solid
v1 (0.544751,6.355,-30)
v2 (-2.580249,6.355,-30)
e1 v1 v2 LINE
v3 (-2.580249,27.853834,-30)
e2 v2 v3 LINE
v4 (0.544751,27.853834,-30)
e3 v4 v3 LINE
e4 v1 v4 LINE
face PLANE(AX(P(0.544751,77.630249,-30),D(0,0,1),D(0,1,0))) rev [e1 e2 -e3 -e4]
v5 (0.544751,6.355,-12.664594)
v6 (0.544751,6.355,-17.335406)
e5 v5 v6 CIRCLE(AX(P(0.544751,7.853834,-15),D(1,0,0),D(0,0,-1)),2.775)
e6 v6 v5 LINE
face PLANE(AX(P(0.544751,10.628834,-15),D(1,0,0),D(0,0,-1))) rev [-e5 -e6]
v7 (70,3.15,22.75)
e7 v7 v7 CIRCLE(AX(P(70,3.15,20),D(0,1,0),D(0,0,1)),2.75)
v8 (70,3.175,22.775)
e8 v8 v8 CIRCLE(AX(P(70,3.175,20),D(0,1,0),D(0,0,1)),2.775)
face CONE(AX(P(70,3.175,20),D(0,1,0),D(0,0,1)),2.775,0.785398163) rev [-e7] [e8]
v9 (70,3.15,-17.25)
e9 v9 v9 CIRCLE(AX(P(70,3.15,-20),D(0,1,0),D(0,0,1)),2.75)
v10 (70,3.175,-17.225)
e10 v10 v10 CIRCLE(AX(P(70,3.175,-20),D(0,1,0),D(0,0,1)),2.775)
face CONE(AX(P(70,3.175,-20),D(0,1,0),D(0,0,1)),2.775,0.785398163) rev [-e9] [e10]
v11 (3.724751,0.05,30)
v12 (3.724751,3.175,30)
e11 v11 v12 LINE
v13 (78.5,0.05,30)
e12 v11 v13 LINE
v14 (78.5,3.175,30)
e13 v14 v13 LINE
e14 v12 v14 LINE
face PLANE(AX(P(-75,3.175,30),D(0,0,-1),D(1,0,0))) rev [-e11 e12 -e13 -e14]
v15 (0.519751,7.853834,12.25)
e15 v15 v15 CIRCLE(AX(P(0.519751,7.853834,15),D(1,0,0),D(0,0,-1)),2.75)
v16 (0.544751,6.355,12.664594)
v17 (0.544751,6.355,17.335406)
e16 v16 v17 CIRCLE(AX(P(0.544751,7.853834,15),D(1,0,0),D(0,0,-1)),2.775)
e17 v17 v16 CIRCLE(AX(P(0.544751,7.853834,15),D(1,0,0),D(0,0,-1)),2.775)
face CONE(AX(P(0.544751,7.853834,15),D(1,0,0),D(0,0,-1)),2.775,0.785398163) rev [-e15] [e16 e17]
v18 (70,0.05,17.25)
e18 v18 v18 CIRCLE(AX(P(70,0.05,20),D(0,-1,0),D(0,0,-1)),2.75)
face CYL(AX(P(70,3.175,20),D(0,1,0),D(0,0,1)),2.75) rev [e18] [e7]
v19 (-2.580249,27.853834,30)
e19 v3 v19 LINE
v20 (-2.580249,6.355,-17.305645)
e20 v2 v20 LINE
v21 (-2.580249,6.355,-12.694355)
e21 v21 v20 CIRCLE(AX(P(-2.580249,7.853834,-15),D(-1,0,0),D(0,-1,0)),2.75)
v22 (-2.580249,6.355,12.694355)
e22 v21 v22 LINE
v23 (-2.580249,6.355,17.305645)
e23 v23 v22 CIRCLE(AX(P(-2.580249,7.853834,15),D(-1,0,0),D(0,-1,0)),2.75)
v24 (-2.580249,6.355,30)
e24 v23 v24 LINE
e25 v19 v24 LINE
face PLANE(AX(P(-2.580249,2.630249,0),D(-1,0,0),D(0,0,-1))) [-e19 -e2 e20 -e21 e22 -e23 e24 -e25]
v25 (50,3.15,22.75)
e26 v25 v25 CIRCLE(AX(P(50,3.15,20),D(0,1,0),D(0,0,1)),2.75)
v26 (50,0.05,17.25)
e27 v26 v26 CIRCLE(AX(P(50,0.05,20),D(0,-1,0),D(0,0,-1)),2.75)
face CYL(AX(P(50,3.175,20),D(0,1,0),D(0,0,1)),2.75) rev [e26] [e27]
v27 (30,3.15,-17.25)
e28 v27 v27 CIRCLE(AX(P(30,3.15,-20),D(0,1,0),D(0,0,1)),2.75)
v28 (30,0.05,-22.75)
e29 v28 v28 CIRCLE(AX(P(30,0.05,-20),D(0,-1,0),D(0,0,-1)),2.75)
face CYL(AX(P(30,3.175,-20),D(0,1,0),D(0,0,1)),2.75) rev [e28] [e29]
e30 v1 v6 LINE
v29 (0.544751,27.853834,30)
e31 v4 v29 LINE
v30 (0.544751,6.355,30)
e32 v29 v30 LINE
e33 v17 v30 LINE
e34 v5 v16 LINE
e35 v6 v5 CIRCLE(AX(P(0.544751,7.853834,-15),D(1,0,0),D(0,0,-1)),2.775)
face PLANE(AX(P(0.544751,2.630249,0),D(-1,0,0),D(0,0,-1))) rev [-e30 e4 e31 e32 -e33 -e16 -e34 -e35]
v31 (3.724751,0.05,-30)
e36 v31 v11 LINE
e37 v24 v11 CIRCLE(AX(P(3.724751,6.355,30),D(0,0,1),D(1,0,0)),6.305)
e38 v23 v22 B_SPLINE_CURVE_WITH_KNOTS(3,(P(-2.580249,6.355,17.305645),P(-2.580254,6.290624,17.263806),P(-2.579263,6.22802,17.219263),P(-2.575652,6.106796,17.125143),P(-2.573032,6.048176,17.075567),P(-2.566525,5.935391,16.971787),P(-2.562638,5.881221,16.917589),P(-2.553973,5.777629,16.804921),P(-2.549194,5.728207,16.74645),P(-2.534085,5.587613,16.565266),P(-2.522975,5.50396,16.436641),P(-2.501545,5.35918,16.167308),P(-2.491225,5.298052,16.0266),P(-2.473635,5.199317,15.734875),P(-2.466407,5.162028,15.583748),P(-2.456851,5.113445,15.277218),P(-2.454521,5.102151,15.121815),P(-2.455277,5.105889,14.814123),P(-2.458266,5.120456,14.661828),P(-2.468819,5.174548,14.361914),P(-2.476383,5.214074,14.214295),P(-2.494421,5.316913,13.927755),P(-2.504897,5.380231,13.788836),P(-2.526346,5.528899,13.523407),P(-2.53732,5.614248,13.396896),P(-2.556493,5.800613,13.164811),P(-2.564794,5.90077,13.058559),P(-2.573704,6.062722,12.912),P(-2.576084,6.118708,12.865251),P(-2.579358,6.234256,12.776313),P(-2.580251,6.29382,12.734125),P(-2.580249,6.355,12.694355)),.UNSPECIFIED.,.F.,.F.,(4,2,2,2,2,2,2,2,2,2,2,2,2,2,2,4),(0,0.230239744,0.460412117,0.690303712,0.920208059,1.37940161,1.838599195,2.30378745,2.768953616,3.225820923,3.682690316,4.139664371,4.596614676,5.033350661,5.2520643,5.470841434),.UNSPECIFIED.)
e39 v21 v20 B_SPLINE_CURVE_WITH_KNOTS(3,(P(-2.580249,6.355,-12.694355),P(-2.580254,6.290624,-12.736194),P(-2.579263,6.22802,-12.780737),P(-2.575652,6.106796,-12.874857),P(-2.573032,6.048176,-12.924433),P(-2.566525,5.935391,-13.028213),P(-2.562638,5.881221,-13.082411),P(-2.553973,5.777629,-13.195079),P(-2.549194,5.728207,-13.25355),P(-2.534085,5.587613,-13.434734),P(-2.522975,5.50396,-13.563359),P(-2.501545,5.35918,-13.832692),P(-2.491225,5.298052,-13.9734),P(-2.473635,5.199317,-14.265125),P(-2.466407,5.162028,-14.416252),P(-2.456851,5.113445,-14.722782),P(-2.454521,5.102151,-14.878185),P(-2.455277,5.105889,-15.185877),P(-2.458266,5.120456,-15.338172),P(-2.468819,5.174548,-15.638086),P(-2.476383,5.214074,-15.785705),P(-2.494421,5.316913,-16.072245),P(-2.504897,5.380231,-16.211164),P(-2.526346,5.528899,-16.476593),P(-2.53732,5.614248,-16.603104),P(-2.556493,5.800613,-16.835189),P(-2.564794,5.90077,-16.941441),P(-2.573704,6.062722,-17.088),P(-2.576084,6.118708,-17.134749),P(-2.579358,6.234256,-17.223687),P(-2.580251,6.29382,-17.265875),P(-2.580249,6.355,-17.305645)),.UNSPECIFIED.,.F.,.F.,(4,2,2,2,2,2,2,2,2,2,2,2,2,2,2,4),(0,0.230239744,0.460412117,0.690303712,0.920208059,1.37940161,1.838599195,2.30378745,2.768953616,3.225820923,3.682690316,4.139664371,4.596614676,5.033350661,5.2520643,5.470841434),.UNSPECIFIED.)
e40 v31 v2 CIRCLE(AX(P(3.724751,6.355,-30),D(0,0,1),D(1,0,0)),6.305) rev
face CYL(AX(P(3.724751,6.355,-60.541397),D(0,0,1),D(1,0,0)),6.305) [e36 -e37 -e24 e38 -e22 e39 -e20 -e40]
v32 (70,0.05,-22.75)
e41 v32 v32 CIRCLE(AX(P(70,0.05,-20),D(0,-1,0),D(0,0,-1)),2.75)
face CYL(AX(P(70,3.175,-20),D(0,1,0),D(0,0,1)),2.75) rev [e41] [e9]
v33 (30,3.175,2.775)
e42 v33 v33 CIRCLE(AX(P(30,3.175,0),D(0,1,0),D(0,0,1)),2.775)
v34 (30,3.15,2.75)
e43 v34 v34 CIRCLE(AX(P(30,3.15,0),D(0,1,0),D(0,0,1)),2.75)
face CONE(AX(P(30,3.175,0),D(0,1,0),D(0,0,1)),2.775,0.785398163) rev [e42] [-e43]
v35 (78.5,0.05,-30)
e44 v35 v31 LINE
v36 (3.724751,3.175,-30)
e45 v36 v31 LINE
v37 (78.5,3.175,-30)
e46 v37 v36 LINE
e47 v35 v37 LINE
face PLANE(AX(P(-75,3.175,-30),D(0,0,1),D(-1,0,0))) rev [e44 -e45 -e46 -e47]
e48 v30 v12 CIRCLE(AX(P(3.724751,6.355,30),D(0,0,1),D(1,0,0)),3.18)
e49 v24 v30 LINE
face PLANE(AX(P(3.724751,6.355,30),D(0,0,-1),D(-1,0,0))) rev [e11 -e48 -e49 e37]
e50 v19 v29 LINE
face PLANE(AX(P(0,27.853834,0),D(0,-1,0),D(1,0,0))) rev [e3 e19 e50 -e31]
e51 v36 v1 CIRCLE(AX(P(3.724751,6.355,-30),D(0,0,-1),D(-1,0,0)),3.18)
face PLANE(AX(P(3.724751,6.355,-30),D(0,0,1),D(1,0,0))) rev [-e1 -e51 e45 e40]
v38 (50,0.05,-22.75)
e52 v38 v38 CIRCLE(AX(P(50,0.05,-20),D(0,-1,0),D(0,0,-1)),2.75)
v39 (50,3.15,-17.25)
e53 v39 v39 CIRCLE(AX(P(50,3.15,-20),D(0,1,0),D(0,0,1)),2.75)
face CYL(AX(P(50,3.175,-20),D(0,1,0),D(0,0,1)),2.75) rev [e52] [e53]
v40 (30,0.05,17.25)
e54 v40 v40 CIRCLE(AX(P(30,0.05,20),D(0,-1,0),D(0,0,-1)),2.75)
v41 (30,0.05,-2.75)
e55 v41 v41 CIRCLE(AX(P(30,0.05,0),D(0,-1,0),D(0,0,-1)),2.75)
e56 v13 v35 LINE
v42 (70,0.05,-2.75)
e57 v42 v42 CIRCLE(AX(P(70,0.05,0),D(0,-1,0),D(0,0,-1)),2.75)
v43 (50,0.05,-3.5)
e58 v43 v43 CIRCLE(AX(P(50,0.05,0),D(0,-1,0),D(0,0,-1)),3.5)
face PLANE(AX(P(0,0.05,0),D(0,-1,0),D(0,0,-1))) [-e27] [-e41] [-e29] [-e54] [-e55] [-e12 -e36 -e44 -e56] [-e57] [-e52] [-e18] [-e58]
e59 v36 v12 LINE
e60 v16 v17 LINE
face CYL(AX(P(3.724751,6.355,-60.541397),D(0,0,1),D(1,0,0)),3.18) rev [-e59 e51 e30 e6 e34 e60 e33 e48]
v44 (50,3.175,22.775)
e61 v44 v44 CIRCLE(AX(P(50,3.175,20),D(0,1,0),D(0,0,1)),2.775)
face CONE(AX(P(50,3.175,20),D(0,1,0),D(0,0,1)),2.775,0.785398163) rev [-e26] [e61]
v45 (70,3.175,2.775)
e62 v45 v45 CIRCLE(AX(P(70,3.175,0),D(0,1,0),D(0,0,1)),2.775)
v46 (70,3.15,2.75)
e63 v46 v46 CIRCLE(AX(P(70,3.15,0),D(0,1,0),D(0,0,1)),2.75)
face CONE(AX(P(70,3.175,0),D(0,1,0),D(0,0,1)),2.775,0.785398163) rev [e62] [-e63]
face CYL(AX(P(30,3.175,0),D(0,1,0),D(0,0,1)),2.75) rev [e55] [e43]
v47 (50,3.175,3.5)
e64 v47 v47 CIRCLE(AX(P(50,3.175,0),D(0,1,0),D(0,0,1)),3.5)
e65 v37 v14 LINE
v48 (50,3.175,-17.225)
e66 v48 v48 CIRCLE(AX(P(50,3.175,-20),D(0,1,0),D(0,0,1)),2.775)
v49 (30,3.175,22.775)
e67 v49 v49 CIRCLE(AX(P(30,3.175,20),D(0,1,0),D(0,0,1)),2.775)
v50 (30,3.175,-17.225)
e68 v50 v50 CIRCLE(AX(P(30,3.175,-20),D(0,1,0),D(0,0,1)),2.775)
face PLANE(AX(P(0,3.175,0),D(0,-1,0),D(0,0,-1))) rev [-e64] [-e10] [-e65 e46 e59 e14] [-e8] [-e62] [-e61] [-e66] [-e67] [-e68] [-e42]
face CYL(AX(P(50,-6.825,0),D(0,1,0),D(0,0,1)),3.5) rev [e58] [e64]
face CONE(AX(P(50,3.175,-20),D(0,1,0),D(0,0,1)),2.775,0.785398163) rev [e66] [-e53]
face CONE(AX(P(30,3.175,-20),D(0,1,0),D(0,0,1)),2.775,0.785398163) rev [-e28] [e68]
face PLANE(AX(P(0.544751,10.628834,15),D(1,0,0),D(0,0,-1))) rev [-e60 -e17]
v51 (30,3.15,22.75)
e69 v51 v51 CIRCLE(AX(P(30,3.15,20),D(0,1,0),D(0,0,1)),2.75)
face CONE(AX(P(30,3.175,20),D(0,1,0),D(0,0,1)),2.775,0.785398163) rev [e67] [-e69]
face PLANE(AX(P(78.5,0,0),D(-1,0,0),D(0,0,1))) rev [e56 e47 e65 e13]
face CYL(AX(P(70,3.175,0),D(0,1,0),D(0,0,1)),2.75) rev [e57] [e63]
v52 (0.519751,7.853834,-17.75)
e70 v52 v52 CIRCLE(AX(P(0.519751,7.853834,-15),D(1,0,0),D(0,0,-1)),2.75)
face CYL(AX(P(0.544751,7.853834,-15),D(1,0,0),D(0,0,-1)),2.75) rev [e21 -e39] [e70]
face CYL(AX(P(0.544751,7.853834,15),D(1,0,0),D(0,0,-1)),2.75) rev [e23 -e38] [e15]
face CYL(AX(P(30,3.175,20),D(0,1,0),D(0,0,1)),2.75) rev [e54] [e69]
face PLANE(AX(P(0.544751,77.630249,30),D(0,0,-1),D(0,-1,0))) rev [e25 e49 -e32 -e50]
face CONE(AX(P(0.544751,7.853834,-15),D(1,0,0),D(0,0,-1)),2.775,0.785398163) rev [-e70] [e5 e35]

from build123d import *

# Parameters (mm, degrees)
SKETCH1_W                      = 150
SKETCH1_H                      = 60
BOSS_EXTRUDE1_DEPTH            = 3.175
CONVERT_SOLID1_OUTLINE_W       = 150
CONVERT_SOLID1_OUTLINE_H       = 60
CONVERT_SOLID1_DEPTH           = 0.05
SKETCHED_START                 = -30
SKETCHED_BEND1_DEPTH           = 60
SKETCHED_BEND1_2_DEPTH         = 60
SKETCH12_W                     = 13.513441401
SKETCH12_H                     = 61.735090191
CUT_EXTRUDE1_DEPTH             = 51.24
SKETCH13_R                     = 3.5
CUT_EXTRUDE2_DEPTH             = 10
SKETCH14_W                     = 60
SKETCH14_H                     = 3.125
BOSS_EXTRUDE2_DEPTH            = 3.5
M5_CLEARANCE_HOLE1_D           = 5.5
M5_CLEARANCE_HOLE1_DEPTH       = 10.1
M5_CLEARANCE_HOLE1_CSINK_D     = 5.55
M5_CLEARANCE_HOLE1_CSINK_ANGLE = 90
M5_CLEARANCE_HOLE1_TIP         = 1.652366702
M5_CLEARANCE_HOLE2_AT_2_COUNT  = 2
M5_CLEARANCE_HOLE2_AT_2_PITCH  = 30


# Read off the part's stored shape, not the designer's step: Convert-Solid1, Sketched Bend1
with BuildPart() as part:
    # Sketch1 → Boss-Extrude1 (new body)
    with BuildSketch(Plane(origin=(0, 0, 0), x_dir=(1, 0, 0), z_dir=(0, 1, 0))):
        Rectangle(SKETCH1_W, SKETCH1_H)
    extrude(amount=BOSS_EXTRUDE1_DEPTH)

    # Convert-Solid1 outline → Convert-Solid1 (cut)
    with BuildSketch(Plane(origin=(0, 0, 0), x_dir=(1, 0, 0), z_dir=(0, 1, 0))):
        Rectangle(CONVERT_SOLID1_OUTLINE_W, CONVERT_SOLID1_OUTLINE_H)
    extrude(amount=CONVERT_SOLID1_DEPTH, mode=Mode.SUBTRACT)

    # Sketched Bend1 outline → Sketched Bend1 (cut)
    with BuildSketch(Plane.XY.offset(SKETCHED_START)):
        with BuildLine():
            ThreePointArc((3.72475079, 0.05), (0.586030908, 0.886777026), (-1.719569645, 3.175))
            Line((-1.719569645, 3.175), (-75, 3.175))
            Line((-75, 3.175), (-75, 0.05))
            Line((-75, 0.05), (3.72475079, 0.05))
        make_face()
    extrude(amount=SKETCHED_BEND1_DEPTH, mode=Mode.SUBTRACT)

    # Sketched Bend1 2 outline → Sketched Bend1 2 (add)
    with BuildSketch(Plane.XY.offset(SKETCHED_START)):
        with BuildLine():
            Line((0.54475079, 77.63024921), (-2.58024921, 77.63024921))
            Line((-2.58024921, 77.63024921), (-2.58024921, 6.355))
            ThreePointArc((-2.58024921, 6.355), (-2.361276869, 4.707792567), (-1.719569645, 3.175))
            Line((-1.719569645, 3.175), (3.72475079, 3.175))
            ThreePointArc((3.72475079, 3.175), (1.476151226, 4.106400436), (0.54475079, 6.355))
            Line((0.54475079, 6.355), (0.54475079, 77.63024921))
        make_face()
    extrude(amount=SKETCHED_BEND1_2_DEPTH)

    # Sketch12 → Cut-Extrude1 (cut)
    with BuildSketch(Plane(origin=(0, 79.093833736, 0), x_dir=(1, 0, 0), z_dir=(0, 1, 0))):
        with Locations((-1.719442409, -0.853480509)):
            Rectangle(SKETCH12_W, SKETCH12_H)
    extrude(amount=-CUT_EXTRUDE1_DEPTH, mode=Mode.SUBTRACT)

    # Sketch13 → Cut-Extrude2 (cut)
    with BuildSketch(Plane(origin=(0, 3.175, 0), x_dir=(1, 0, 0), z_dir=(0, 1, 0))):
        with Locations(Location((50, 0, 0), (0, 0, 270))):
            Circle(SKETCH13_R)
    extrude(amount=-CUT_EXTRUDE2_DEPTH, mode=Mode.SUBTRACT)

    # Sketch14 → Boss-Extrude2 (add)
    with BuildSketch(Plane(origin=(75, 0, 0), x_dir=(0, 0, -1), z_dir=(1, 0, 0))):
        with Locations((0, 1.6125)):
            Rectangle(SKETCH14_W, SKETCH14_H)
    extrude(amount=BOSS_EXTRUDE2_DEPTH)

    # M5 Clearance Hole1
    with Locations(Plane(origin=(0, 3.175, 0), x_dir=(1, 0, 0), z_dir=(0, 1, 0))):
        with Locations((30, 20), (70, 20), (70, -20), (30, -20), (50, 20), (50, -20), (70, 0), (30, 0)):
            CounterSinkHole(M5_CLEARANCE_HOLE1_D / 2, M5_CLEARANCE_HOLE1_CSINK_D / 2, depth=M5_CLEARANCE_HOLE1_DEPTH, counter_sink_angle=M5_CLEARANCE_HOLE1_CSINK_ANGLE)
            with Locations((0, 0, -(M5_CLEARANCE_HOLE1_DEPTH + M5_CLEARANCE_HOLE1_TIP / 2))):  # 118° drill point
                Cone(0, M5_CLEARANCE_HOLE1_D / 2, M5_CLEARANCE_HOLE1_TIP, mode=Mode.SUBTRACT)

    # Sketch21 → M5 Clearance Hole2 (revolve, cut)
    with BuildSketch(Plane(origin=(0.54475079, 7.853833736, 15), x_dir=(0, 0, -1), z_dir=(0, 1, 0))):
        Polygon((0, 0), (0, 11.752366702), (2.75, 10.1), (2.75, 0.025), (2.775, 0), align=None)
    m5_clearance_hole2 = revolve(axis=Axis((6.89475079, 7.853833736, 15), (-1, 0, 0)), mode=Mode.SUBTRACT)

    # M5 Clearance Hole2 at 2: M5 Clearance Hole2 ×2
    with Locations(*[(0, 0, -i * M5_CLEARANCE_HOLE2_AT_2_PITCH) for i in range(1, M5_CLEARANCE_HOLE2_AT_2_COUNT)]):
        add(m5_clearance_hole2, mode=Mode.SUBTRACT)


solid = part.part
